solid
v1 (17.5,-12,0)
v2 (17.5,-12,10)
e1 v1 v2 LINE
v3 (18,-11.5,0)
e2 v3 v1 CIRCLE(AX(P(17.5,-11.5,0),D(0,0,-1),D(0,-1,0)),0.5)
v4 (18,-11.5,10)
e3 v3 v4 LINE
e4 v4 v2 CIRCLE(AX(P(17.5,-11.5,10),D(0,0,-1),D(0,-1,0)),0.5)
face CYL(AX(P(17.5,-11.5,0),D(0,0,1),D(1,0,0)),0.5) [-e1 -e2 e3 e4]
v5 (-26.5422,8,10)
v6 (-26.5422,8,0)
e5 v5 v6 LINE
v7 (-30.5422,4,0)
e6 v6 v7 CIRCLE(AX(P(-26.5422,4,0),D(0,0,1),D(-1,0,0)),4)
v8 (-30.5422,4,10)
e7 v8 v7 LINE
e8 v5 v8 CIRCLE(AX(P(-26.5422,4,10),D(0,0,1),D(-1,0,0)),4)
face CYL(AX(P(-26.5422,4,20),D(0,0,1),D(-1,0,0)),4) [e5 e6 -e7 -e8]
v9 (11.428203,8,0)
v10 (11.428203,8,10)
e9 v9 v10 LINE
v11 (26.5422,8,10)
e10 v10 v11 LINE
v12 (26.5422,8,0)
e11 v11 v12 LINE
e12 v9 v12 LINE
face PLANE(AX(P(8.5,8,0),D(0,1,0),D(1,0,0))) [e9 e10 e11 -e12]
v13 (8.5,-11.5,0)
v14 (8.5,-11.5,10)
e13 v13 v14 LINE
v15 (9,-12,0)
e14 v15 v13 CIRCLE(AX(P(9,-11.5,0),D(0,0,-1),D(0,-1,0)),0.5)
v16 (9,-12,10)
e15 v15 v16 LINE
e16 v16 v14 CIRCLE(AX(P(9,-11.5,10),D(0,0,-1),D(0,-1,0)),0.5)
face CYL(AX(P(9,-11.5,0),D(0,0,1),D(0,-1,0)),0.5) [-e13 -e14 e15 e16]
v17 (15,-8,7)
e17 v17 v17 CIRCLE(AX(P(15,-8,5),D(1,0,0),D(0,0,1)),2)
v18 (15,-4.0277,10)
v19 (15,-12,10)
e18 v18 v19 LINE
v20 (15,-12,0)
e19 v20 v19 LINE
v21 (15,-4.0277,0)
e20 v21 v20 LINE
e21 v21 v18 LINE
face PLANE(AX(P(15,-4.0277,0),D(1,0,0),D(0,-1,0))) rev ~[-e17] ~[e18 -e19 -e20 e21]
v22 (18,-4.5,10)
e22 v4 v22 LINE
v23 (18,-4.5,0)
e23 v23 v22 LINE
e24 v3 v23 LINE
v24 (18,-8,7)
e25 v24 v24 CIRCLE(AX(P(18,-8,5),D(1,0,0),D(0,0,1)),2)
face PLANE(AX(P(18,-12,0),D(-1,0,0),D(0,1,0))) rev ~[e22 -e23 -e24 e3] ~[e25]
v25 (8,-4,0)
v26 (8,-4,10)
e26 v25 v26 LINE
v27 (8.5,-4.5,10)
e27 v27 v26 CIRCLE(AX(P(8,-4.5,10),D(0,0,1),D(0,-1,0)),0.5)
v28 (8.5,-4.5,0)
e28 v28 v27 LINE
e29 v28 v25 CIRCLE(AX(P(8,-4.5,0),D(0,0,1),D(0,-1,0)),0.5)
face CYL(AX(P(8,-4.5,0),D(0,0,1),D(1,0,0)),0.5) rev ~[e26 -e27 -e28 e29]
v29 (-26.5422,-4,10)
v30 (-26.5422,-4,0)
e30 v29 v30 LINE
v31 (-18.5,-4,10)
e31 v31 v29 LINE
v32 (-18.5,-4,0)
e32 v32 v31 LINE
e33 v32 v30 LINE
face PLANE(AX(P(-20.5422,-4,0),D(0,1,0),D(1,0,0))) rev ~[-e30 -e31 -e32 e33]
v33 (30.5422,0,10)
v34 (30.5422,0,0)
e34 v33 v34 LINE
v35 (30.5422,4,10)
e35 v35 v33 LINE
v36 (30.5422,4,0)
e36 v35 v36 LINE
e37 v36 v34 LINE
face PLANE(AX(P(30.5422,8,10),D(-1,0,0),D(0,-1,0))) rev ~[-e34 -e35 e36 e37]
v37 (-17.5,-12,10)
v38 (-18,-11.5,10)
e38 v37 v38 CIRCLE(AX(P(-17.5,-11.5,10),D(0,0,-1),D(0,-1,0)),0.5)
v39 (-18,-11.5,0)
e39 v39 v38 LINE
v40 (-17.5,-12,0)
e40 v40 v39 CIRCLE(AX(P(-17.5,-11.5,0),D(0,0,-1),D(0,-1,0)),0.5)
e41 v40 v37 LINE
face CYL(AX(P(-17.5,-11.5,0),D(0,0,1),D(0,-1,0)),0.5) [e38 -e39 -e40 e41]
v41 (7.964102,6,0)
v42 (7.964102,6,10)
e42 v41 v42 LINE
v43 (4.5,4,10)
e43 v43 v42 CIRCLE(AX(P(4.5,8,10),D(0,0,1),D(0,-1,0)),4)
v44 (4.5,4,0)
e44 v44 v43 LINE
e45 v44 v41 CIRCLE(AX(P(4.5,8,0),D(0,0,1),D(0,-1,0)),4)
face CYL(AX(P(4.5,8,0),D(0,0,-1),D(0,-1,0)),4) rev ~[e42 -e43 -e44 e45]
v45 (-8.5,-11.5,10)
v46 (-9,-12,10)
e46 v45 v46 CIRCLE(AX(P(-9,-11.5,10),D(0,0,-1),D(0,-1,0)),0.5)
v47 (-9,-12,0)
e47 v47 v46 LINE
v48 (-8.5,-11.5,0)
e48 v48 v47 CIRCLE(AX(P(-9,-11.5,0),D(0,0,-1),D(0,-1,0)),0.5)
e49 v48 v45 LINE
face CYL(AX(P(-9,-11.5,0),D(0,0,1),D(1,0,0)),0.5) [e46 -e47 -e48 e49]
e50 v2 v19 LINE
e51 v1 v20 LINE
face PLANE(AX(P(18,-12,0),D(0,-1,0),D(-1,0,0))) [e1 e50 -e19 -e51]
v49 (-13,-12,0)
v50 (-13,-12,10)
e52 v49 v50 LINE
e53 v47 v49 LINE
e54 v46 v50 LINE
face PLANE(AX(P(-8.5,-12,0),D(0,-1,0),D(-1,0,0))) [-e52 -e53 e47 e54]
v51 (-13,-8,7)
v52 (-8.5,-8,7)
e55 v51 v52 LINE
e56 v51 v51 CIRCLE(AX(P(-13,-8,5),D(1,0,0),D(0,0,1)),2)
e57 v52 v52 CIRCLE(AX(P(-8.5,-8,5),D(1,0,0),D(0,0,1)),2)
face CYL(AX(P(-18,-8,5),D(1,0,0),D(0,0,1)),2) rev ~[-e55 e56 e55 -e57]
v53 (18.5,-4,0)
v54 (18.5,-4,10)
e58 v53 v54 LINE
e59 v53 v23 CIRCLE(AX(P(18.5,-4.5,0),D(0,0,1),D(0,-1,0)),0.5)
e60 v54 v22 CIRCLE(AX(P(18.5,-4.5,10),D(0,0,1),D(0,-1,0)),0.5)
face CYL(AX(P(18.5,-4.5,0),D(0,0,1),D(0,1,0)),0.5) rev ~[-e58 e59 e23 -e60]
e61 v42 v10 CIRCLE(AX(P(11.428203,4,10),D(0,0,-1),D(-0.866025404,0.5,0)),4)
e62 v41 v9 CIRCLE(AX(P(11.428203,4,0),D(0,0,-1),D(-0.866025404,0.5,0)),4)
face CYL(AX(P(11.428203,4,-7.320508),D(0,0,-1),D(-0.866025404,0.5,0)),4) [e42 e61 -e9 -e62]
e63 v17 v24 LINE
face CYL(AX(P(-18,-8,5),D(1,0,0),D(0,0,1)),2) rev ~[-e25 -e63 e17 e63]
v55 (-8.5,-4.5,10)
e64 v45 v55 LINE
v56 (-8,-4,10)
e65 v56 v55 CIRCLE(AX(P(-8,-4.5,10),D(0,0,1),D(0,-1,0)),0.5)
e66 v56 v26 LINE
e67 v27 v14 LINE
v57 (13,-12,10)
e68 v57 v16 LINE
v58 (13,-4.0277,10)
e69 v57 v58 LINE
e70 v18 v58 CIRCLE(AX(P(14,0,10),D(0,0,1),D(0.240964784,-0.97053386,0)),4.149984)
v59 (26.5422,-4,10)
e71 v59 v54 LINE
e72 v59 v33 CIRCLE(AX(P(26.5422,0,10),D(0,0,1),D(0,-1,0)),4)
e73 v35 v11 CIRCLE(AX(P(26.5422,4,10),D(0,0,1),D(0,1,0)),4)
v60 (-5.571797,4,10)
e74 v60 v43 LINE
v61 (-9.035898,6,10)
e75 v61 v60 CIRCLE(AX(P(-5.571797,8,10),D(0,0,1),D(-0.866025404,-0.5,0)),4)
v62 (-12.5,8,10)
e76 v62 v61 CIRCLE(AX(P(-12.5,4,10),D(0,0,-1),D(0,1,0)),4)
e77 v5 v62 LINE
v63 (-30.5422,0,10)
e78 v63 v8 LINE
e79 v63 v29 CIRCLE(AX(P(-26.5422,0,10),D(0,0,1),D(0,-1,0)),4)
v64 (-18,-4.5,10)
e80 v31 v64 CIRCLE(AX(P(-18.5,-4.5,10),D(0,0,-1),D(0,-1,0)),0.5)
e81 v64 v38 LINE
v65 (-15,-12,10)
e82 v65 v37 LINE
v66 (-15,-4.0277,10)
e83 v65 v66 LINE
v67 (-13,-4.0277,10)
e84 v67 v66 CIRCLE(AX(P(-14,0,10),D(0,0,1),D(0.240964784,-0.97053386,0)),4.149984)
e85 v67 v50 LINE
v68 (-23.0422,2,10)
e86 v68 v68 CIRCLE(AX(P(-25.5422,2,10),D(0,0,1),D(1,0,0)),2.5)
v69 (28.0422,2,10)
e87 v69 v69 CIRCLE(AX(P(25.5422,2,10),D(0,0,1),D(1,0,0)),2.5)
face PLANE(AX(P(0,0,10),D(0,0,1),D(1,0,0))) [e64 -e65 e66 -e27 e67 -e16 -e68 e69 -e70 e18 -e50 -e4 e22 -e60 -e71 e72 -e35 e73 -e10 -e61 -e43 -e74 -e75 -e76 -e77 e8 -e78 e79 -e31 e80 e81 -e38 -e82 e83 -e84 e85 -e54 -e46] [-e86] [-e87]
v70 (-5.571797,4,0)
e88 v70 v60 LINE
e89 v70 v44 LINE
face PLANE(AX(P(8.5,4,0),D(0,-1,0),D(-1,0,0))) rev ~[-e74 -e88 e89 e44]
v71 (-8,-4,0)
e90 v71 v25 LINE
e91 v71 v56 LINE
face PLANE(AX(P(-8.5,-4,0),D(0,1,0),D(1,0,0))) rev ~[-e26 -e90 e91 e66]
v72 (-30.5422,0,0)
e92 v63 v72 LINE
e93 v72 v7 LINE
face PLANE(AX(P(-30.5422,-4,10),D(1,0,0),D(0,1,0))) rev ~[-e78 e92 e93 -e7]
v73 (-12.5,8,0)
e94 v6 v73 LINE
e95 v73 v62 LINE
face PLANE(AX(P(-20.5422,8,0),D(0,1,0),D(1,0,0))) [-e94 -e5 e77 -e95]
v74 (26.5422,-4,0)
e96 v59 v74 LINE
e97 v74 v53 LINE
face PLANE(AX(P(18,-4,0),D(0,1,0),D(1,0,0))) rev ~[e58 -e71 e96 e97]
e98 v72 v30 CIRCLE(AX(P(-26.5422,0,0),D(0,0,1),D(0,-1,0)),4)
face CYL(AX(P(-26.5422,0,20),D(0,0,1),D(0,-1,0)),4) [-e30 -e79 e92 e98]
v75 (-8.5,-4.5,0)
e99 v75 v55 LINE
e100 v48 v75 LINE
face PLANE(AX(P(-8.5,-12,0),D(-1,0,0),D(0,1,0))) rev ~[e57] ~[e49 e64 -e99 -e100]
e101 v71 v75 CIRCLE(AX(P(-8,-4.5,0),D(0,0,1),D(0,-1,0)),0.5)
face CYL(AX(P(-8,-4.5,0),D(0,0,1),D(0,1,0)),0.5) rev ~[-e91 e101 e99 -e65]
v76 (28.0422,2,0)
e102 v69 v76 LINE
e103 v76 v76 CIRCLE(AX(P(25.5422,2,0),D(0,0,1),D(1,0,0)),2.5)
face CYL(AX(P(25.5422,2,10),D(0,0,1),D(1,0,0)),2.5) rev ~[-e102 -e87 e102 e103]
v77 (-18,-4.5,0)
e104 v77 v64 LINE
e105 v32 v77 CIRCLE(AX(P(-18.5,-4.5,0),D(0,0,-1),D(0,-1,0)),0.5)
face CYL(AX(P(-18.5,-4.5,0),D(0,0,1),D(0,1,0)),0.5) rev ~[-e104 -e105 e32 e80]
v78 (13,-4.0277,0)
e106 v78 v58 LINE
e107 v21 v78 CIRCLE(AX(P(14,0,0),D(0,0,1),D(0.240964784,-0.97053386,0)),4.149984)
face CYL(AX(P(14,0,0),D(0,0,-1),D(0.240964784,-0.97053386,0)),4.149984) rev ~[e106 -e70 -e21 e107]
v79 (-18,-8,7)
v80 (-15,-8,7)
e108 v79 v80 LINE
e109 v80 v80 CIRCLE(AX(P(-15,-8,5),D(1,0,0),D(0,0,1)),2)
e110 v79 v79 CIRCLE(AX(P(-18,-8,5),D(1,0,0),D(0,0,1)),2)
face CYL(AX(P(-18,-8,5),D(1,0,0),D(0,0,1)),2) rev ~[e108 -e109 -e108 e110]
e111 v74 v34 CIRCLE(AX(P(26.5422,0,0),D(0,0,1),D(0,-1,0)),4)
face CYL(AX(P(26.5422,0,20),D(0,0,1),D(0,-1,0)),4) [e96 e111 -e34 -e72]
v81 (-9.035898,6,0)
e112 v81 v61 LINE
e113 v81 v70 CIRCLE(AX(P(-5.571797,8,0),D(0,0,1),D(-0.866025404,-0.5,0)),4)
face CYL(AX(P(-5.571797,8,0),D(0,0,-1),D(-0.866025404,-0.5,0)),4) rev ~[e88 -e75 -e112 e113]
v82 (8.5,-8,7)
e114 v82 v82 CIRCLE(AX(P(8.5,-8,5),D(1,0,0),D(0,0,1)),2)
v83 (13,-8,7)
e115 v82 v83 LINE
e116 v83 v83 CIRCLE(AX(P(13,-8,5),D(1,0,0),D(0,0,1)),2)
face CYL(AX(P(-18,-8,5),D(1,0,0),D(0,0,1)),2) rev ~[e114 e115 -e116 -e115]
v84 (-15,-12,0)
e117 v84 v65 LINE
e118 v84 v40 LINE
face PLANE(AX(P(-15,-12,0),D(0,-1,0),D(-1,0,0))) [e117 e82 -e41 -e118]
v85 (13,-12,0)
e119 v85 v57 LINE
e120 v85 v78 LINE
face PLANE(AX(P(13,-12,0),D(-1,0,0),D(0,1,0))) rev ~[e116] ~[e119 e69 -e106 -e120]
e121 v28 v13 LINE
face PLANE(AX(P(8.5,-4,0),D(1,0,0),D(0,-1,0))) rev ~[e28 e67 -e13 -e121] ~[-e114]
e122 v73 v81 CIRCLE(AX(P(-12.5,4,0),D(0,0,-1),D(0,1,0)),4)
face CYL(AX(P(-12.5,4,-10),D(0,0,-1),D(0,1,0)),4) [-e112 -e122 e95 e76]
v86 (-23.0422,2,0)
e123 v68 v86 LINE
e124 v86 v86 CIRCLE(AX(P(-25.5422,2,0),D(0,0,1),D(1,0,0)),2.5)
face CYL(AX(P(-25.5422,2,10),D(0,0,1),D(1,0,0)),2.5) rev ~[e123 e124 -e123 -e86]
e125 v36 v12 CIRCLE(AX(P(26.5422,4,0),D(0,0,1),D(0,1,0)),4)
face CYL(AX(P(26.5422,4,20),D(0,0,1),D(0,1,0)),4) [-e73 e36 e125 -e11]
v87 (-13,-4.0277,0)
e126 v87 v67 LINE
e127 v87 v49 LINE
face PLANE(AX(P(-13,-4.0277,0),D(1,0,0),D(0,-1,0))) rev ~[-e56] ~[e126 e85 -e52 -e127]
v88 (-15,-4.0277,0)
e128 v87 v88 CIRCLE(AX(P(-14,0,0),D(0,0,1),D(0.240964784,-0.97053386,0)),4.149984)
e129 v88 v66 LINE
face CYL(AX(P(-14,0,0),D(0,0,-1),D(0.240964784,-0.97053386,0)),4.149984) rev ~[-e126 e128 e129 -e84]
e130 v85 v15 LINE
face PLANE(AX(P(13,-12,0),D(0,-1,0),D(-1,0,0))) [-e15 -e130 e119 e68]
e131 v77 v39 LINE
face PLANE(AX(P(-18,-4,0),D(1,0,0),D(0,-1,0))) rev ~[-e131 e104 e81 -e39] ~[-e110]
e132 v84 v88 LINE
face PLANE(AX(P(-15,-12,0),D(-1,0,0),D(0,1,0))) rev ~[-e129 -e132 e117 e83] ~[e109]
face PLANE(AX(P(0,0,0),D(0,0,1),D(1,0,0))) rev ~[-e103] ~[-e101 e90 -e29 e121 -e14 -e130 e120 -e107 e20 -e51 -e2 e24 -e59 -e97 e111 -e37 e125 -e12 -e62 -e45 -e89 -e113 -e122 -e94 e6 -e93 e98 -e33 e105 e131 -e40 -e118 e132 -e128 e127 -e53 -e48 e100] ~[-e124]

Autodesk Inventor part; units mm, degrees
ref_plane "YZ Plane" through (0, 0, 0) normal (1, 0, 0) x (0, 1, 0)
ref_plane "XZ Plane" through (0, 0, 0) normal (0, 1, 0) x (-1, 0, 0)
ref_plane "XY Plane" through (0, 0, 0) normal (0, 0, 1) x (1, 0, 0)
sketch "Sketch1" plane through (0, 0, 0) normal (0, 0, 1) x (1, 0, 0)
  line L0 (-20.5422, 8) -> (20.5422, 8)
  line L1 (20.5422, 8) -> (20.5422, -12)
  line L2 (20.5422, -12) -> (-20.5422, -12)
  line L3 (-20.5422, -12) -> (-20.5422, 8)
  arc A0 (-13, -4.0277) -> (-15, -4.0277) centre (-14, 0) ccw
  arc A1 (15, -4.0277) -> (13, -4.0277) centre (14, 0) ccw
  line L4 (0, 8) -> (0, -12) construction
  line L5 (-13, -4.0277) -> (-13, -12)
  line L6 (-13, -12) -> (-15, -12)
  line L7 (-15, -12) -> (-15, -4.0277)
  line L8 (15, -4.0277) -> (15, -12)
  line L9 (15, -12) -> (13, -12)
  line L10 (13, -12) -> (13, -4.0277)
  line L11 (-20.5422, -4) -> (-18, -4)
  line L12 (-18, -4) -> (-18, -12)
  line L13 (-18, -12) -> (-20.5422, -12)
  line L14 (-20.5422, -12) -> (-20.5422, -4)
  line L15 (18, -4) -> (20.5422, -4)
  line L16 (20.5422, -4) -> (20.5422, -12)
  line L17 (20.5422, -12) -> (18, -12)
  line L18 (18, -12) -> (18, -4)
  line L19 (-8.5, -4) -> (8.5, -4)
  line L20 (8.5, -4) -> (8.5, -12)
  line L21 (8.5, -12) -> (-8.5, -12)
  line L22 (-8.5, -12) -> (-8.5, -4)
  line L23 (-8.5, 8) -> (8.5, 8)
  line L24 (8.5, 8) -> (8.5, 4)
  line L25 (8.5, 4) -> (-8.5, 4)
  line L26 (-8.5, 4) -> (-8.5, 8)
  point P0 (0, 0)
  point P1 (0, -2)
  point P2 (-14, -4.3116)
  point P3 (14, -4.0277)
  point P4 (0, -4)
  point P5 (-13, -12)
  point P6 (-8.5, -12)
  point P7 (8.5, -12)
  point P8 (20.5422, -4)
  point P9 (8.5, 8)
  point P10 (-8.5, 8)
  point P11 (-15, -12)
  dimension "d0" = 8.3
  dimension "d1" = 28
  dimension "d2" = 2
  dimension "d4" = 2
  dimension "d6" = 41.0844
  dimension "d7" = 8
  dimension "d8" = 12
  dimension "d9" = 20
  dimension "d10" = 3
  dimension "d11" = 3
  dimension "d13" = 8
  dimension "d15" = 5.5
  dimension "d16" = 5.5
  dimension "d17" = 4
  dimension "d18" = 4
extrude "Extrusion1" add sketch "Sketch1" along normal blind 10 contours L0 L26 L25 L24 L1 L15 L18 L2 L8 A1 L10 L20 L19 L22 L5 A0 L7 L12 L11 L3
sketch "Sketch2" plane through (-18, -12, 0) normal (-1, 0, 0) x (0, 0, 1)
  circle A0 centre (5, 4) radius 1.75
  line L0 (0, 0) -> (10, 0) projected
  line L1 (10, 8) -> (10, 0) projected
  circle A1 centre (5, 4) radius 3 construction
  point P0 (0, 12)
  point P1 (5, 0)
  point P2 (10, 4)
  dimension "d22" = 3.5
  dimension "d23" = 6
hole "Hole1" at (-18, -8, 5) direction (1, 0, 0) diameter 4 end through all
fillet "Fillet2" radius 0.5 8 edges at (-18, -4, 5) (-8.5, -4, 5) (8.5, -4, 5) (18, -4, 5) (-18, -12, 5) (-8.5, -12, 5) (8.5, -12, 5) (18, -12, 5)
sketch "Sketch4" plane through (0, 0, 10) normal (0, 0, 1) x (1, 0, 0)
  line L0 (-30.5422, 8) -> (-20.5422, 8)
  line L1 (-20.5422, 8) -> (-20.5422, -4)
  line L2 (-20.5422, -4) -> (-30.5422, -4)
  line L3 (-30.5422, -4) -> (-30.5422, 8)
  line L4 (20.5422, 8) -> (30.5422, 8)
  line L5 (30.5422, 8) -> (30.5422, -4)
  line L6 (30.5422, -4) -> (20.5422, -4)
  line L7 (20.5422, -4) -> (20.5422, 8)
  line L8 (20.5422, -4) -> (20.5422, 8) projected
  line L9 (18.5, -4) -> (20.5422, -4) projected
  line L10 (20.5422, 8) -> (8.5, 8) projected
  line L11 (-8.5, 8) -> (-20.5422, 8) projected
  line L12 (-20.5422, -4) -> (-18.5, -4) projected
  line L13 (-20.5422, 8) -> (-20.5422, -4) projected
  circle A0 centre (-25.5422, 2) radius 2.5
  circle A1 centre (25.5422, 2) radius 2.5
  point P0 (0, 0)
  point P1 (25.5422, 8)
  point P2 (30.5422, 2)
  point P3 (-30.5422, 2)
  point P4 (-25.5422, 8)
  dimension "d32" = 10
  dimension "d33" = 5
  dimension "d34" = 0
  dimension "d35" = 0
  dimension "d36" = 0
  dimension "d37" = 0
extrude "Extrusion2" add sketch "Sketch4" against normal up to surface (10 mm away)
fillet "Fillet3" radius 4 8 edges at (8.5, 8, 5) (30.5422, 8, 5) (30.5422, -4, 5) (8.5, 4, 5) (-8.5, 4, 5) (-8.5, 8, 5) (-30.5422, 8, 5) (-30.5422, -4, 5)
equation "\"d4\" = d2"
equation "\"d11\" = d10"
equation "\"d13\" = d7"
properties part number "0008-30-006"
